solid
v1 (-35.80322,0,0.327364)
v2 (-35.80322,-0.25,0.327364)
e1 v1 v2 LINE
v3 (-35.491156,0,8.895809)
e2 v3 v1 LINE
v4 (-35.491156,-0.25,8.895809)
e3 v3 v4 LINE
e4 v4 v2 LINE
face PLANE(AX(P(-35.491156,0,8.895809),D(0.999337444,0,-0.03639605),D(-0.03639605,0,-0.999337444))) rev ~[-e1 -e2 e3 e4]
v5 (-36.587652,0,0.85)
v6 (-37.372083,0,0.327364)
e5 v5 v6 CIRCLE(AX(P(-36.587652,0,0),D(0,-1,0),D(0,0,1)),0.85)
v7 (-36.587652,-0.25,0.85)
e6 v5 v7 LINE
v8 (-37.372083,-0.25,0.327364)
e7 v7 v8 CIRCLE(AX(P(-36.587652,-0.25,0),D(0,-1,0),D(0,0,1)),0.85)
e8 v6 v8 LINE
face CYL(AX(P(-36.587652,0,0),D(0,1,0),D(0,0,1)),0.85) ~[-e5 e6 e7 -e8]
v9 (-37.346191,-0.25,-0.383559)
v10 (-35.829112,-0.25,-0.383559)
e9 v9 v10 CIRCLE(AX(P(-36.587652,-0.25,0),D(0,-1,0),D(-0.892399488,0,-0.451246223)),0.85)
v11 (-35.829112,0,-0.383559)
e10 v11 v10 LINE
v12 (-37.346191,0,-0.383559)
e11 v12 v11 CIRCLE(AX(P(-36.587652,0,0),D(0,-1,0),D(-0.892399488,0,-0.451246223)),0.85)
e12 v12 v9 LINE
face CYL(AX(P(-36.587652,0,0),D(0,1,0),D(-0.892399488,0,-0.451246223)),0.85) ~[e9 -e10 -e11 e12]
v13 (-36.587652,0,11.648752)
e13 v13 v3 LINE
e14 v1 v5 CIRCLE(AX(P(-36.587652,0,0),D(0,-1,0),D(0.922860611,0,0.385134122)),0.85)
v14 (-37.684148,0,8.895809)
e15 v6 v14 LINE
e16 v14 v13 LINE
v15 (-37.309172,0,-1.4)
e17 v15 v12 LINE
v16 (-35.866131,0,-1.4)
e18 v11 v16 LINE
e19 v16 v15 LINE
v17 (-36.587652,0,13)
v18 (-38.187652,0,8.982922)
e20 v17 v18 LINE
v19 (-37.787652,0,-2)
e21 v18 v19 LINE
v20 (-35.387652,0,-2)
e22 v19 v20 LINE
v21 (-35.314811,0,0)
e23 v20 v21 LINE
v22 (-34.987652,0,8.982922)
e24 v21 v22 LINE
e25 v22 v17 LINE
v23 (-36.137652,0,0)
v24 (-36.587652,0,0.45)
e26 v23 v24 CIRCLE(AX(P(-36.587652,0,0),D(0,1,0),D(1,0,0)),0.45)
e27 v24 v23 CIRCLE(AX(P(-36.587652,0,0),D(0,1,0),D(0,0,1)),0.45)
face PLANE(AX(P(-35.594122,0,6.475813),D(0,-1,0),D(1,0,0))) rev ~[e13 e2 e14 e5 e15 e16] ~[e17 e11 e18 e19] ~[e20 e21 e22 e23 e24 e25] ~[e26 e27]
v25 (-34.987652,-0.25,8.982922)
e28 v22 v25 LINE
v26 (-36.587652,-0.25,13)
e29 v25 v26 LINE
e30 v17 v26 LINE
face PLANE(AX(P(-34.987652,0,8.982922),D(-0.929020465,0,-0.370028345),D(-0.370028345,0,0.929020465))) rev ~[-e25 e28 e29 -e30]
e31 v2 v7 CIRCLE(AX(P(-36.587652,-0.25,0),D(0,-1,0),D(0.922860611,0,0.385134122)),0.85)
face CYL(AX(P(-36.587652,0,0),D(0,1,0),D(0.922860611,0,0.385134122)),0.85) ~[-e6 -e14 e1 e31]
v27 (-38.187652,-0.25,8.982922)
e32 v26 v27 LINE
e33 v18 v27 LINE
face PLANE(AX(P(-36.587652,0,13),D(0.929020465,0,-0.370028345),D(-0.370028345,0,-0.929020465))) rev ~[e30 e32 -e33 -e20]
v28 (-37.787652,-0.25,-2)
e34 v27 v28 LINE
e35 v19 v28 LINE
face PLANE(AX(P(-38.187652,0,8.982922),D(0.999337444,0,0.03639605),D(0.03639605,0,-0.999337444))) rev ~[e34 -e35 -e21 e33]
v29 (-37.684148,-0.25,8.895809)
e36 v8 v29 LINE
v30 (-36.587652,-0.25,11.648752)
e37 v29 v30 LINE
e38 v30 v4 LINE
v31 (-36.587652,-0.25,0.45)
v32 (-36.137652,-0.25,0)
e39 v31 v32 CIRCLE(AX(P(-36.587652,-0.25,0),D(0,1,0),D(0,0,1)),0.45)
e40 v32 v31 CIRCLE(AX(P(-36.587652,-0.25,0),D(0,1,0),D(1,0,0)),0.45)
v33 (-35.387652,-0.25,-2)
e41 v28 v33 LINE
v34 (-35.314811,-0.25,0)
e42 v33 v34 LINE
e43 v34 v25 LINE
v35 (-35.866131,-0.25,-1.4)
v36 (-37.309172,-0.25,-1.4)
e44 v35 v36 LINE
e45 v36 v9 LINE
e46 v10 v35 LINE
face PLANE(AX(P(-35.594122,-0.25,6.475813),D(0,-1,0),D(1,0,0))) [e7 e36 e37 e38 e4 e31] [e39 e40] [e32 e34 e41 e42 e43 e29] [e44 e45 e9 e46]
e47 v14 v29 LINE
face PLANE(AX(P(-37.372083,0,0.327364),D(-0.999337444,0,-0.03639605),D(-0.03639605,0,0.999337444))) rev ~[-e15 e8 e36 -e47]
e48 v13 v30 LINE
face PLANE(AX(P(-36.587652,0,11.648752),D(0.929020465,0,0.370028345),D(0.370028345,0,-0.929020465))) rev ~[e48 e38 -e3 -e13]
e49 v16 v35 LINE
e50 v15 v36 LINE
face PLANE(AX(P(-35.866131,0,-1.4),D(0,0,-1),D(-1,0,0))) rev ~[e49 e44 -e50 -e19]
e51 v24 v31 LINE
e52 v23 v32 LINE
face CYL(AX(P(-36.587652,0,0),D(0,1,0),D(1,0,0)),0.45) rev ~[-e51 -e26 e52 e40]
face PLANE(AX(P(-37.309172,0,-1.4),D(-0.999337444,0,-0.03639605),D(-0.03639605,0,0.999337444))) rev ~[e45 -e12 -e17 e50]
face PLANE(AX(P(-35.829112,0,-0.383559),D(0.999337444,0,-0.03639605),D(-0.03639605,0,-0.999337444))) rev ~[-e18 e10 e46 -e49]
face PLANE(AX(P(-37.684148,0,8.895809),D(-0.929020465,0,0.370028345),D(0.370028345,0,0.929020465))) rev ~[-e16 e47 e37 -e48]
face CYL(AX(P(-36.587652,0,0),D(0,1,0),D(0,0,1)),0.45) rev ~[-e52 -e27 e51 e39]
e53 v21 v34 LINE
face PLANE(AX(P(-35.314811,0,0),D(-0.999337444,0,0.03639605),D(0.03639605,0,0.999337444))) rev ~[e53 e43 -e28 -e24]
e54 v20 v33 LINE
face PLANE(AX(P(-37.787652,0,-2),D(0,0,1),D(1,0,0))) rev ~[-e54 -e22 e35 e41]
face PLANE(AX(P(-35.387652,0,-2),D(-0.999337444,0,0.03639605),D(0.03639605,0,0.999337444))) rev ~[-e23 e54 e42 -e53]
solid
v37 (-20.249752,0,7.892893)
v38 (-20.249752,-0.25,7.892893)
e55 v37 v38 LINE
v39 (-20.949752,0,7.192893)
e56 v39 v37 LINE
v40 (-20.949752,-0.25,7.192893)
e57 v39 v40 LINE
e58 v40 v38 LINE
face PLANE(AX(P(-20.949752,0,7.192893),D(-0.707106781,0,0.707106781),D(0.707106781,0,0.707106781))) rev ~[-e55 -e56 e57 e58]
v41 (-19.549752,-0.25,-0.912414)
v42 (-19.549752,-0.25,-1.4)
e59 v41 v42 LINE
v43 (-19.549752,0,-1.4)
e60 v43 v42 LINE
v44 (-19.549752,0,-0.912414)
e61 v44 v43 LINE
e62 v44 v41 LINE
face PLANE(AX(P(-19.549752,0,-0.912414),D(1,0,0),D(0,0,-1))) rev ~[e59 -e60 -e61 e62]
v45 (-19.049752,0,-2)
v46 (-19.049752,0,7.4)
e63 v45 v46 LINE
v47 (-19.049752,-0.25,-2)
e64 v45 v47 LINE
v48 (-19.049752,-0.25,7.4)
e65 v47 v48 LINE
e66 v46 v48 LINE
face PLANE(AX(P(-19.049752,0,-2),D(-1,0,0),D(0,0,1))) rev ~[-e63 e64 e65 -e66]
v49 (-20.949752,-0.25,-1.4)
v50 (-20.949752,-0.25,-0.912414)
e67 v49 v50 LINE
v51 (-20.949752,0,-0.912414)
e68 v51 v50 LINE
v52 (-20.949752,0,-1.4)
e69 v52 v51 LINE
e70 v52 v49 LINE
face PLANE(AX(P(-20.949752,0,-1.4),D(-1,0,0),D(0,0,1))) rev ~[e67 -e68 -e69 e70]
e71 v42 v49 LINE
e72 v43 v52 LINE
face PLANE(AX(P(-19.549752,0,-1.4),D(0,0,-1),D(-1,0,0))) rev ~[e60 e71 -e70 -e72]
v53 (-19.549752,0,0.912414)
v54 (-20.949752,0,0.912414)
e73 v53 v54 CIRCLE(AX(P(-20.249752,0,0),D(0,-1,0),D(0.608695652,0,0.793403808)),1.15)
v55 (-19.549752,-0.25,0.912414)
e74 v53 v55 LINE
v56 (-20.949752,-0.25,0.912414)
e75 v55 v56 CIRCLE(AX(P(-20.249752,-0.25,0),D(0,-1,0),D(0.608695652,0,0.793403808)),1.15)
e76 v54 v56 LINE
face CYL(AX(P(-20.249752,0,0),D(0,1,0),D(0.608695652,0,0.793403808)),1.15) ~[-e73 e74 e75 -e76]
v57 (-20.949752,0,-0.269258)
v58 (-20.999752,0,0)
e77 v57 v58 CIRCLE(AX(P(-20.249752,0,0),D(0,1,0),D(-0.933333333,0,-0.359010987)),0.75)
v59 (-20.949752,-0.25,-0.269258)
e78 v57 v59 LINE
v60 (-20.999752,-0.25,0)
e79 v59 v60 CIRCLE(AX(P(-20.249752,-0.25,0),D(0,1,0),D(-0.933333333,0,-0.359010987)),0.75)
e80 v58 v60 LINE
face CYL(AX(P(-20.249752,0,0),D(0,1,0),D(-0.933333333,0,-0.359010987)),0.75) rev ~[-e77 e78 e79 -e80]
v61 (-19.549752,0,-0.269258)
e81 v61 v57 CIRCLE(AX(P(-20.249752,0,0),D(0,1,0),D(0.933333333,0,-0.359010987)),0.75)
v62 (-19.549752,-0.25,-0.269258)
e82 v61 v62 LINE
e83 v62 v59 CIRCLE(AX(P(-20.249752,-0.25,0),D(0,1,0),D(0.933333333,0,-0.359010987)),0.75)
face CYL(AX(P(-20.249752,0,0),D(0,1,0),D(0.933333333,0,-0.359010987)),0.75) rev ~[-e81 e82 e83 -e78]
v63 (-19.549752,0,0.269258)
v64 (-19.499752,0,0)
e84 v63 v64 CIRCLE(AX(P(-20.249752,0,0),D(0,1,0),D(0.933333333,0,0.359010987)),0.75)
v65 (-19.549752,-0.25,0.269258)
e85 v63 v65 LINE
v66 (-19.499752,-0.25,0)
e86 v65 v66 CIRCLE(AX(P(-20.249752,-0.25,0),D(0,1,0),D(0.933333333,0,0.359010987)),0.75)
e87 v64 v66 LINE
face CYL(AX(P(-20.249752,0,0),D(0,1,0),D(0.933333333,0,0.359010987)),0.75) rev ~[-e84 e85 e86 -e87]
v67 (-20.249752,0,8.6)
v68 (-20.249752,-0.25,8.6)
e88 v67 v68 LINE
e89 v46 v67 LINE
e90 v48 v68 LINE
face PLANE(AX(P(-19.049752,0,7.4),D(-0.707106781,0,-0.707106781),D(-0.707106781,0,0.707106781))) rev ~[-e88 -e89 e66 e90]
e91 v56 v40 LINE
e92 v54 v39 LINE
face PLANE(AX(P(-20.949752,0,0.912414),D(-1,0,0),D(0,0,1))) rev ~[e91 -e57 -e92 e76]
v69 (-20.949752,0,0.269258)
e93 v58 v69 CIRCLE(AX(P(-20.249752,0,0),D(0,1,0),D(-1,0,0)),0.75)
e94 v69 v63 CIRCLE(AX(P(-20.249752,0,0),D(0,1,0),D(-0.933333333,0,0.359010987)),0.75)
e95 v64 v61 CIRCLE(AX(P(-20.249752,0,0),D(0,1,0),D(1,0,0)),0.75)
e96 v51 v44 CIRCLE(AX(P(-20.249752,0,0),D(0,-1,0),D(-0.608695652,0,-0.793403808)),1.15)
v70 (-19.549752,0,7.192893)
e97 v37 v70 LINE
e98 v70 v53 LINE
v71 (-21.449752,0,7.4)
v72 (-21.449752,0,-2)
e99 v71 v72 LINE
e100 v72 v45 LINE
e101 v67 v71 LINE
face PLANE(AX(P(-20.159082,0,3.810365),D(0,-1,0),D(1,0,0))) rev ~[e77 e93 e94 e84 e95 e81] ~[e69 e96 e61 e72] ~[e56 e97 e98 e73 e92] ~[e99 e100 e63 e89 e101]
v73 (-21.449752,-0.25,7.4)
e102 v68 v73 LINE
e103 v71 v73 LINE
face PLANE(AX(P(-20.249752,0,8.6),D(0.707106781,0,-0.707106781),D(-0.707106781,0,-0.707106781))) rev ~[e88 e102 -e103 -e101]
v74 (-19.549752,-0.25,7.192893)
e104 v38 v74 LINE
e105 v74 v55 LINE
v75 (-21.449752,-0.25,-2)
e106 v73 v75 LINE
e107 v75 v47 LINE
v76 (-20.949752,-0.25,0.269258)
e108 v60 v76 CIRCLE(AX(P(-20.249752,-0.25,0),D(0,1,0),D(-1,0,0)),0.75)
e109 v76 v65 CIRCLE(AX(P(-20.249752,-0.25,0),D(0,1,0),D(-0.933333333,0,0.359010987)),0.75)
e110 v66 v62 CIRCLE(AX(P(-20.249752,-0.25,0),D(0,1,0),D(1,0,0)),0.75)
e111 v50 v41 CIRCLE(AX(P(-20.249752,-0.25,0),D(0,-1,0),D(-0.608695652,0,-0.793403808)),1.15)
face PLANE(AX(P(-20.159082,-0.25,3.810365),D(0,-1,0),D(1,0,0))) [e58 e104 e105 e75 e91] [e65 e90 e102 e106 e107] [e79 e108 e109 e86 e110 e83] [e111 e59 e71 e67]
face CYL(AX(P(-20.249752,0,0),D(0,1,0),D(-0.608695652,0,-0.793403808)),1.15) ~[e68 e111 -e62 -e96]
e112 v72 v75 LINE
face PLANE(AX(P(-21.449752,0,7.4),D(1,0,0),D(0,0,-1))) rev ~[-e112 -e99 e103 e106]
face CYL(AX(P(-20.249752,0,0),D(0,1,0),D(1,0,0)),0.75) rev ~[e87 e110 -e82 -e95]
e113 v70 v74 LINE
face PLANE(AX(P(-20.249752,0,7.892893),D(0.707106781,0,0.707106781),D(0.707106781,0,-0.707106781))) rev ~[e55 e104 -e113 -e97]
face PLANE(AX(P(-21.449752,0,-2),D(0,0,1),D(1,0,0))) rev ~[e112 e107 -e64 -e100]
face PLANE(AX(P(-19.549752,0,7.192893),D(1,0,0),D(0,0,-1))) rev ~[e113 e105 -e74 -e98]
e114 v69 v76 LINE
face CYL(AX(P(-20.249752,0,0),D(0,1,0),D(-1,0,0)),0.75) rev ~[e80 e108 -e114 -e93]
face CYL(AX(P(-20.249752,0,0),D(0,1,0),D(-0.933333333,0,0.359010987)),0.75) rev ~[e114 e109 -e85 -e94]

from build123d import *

# Parameters (mm, degrees)
F1_DEPTH = 0.25
F0_W     = 3
F0_H     = 0.6


# Not quite as in the source:
# - a feature names something its author has since deleted; it is built from what else it names


with BuildPart() as f1:
    # F0 (on Front) → F1 (new body)
    with BuildSketch(Plane.XZ):
        with BuildLine():
            Line((-21.4497518182, 1.5), (-21.4497518182, 0))
            Line((-21.4497518182, 0), (-21.3997518182, 0))
            ThreePointArc((-21.3997518182, 0), (-21.2811343854, 0.5086747487), (-20.9497518182, 0.9124143795))
            Line((-20.9497518182, 0.9124143795), (-20.9497518182, 1.5))
            Line((-20.9497518182, 1.5), (-20.9497518182, 7.1928932188))
            Line((-20.9497518182, 7.1928932188), (-20.2497518182, 7.8928932188))
            Line((-20.2497518182, 7.8928932188), (-19.5497518182, 7.1928932188))
            Line((-19.5497518182, 7.1928932188), (-19.5497518182, 1.5))
            Line((-19.5497518182, 1.5), (-19.5497518182, 0.9124143795))
            ThreePointArc((-19.5497518182, 0.9124143795), (-19.2183692509, 0.5086747487), (-19.0997518182, 0))
            ThreePointArc((-19.0997518182, 0), (-19.2183692509, -0.5086747487), (-19.5497518182, -0.9124143795))
            Line((-19.5497518182, -0.9124143795), (-19.5497518182, -1.4))
            Line((-19.5497518182, -1.4), (-19.0497518182, -1.4))
            Line((-19.0497518182, -1.4), (-19.0497518182, 1.5))
            Line((-19.0497518182, 1.5), (-19.0497518182, 7.4))
            Line((-19.0497518182, 7.4), (-20.2497518182, 8.6))
            Line((-20.2497518182, 8.6), (-21.4497518182, 7.4))
            Line((-21.4497518182, 7.4), (-21.4497518182, 1.5))
        make_face()
        with BuildLine():
            Line((-21.3997518182, 0), (-21.4497518182, 0))
            Line((-21.4497518182, 0), (-21.4497518182, -1.4))
            Line((-21.4497518182, -1.4), (-20.9497518182, -1.4))
            Line((-20.9497518182, -1.4), (-20.9497518182, -0.9124143795))
            ThreePointArc((-20.9497518182, -0.9124143795), (-21.2811343854, -0.5086747487), (-21.3997518182, 0))
        make_face()
        Polygon((-20.9497518182, -1.4), (-21.4497518182, -1.4), (-21.4497518182, -2), (-20.2497518182, -2), (-19.0497518182, -2), (-19.0497518182, -1.4), (-19.5497518182, -1.4), (-20.2497518182, -1.4), align=None)
        with BuildLine():
            ThreePointArc((-19.5497518182, 0.9124143795), (-20.2497518182, 1.15), (-20.9497518182, 0.9124143795))
            Line((-20.9497518182, 0.9124143795), (-20.9497518182, 0.2692582404))
            ThreePointArc((-20.9497518182, 0.2692582404), (-20.2497518182, 0.75), (-19.5497518182, 0.2692582404))
            Line((-19.5497518182, 0.2692582404), (-19.5497518182, 0.9124143795))
        make_face()
        with BuildLine():
            ThreePointArc((-19.0997518182, 0), (-19.2183692509, 0.5086747487), (-19.5497518182, 0.9124143795))
            Line((-19.5497518182, 0.9124143795), (-19.5497518182, 0.2692582404))
            ThreePointArc((-19.5497518182, 0.2692582404), (-19.512357758, 0.1369306394), (-19.4997518182, 0))
            ThreePointArc((-19.4997518182, 0), (-19.512357758, -0.1369306394), (-19.5497518182, -0.2692582404))
            Line((-19.5497518182, -0.2692582404), (-19.5497518182, -0.9124143795))
            ThreePointArc((-19.5497518182, -0.9124143795), (-19.2183692509, -0.5086747487), (-19.0997518182, 0))
        make_face()
        with BuildLine():
            Line((-20.9497518182, -0.2692582404), (-20.9497518182, -0.9124143795))
            ThreePointArc((-20.9497518182, -0.9124143795), (-20.2497518182, -1.15), (-19.5497518182, -0.9124143795))
            Line((-19.5497518182, -0.9124143795), (-19.5497518182, -0.2692582404))
            ThreePointArc((-19.5497518182, -0.2692582404), (-20.2497518182, -0.75), (-20.9497518182, -0.2692582404))
        make_face()
        with BuildLine():
            Line((-20.9997518182, 0), (-21.3997518182, 0))
            ThreePointArc((-21.3997518182, 0), (-21.2811343854, -0.5086747487), (-20.9497518182, -0.9124143795))
            Line((-20.9497518182, -0.9124143795), (-20.9497518182, -0.2692582404))
            ThreePointArc((-20.9497518182, -0.2692582404), (-20.9871458784, -0.1369306394), (-20.9997518182, 0))
        make_face()
        with BuildLine():
            ThreePointArc((-20.9497518182, 0.9124143795), (-21.2811343854, 0.5086747487), (-21.3997518182, 0))
            Line((-21.3997518182, 0), (-20.9997518182, 0))
            ThreePointArc((-20.9997518182, 0), (-20.9871458784, 0.1369306394), (-20.9497518182, 0.2692582404))
            Line((-20.9497518182, 0.2692582404), (-20.9497518182, 0.9124143795))
        make_face()
    extrude(amount=F1_DEPTH)


with BuildPart() as f1b:
    # F0 (on Front) → F1, piece 2 (new body)
    with BuildSketch(Plane.XZ):
        with BuildLine():
            ThreePointArc((-28.7187018186, 0.6873863542), (-29.0461968385, 0.4107919181), (-29.1687018186, 0))
            Line((-29.1687018186, 0), (-28.7687018186, 0))
            ThreePointArc((-28.7687018186, 0), (-28.7559702577, 0.0935414347), (-28.7187018186, 0.1802775638))
            Line((-28.7187018186, 0.1802775638), (-28.7187018186, 0.6873863542))
        make_face()
        with BuildLine():
            Line((-28.7687018186, 0), (-29.1687018186, 0))
            ThreePointArc((-29.1687018186, 0), (-29.0461968385, -0.4107919181), (-28.7187018186, -0.6873863542))
            Line((-28.7187018186, -0.6873863542), (-28.7187018186, -0.1802775638))
            ThreePointArc((-28.7187018186, -0.1802775638), (-28.7559702577, -0.0935414347), (-28.7687018186, 0))
        make_face()
        with BuildLine():
            Line((-28.7187018186, 12.9938064694), (-28.7187018186, 0.6873863542))
            ThreePointArc((-28.7187018186, 0.6873863542), (-28.5719340514, 0.7341797347), (-28.4187018186, 0.75))
            Line((-28.4187018186, 0.75), (-28.4187018186, 12.9938064694))
            Line((-28.4187018186, 12.9938064694), (-28.7187018186, 12.9938064694))
        make_face()
        with BuildLine():
            ThreePointArc((-28.4187018186, 0.75), (-28.5719340514, 0.7341797347), (-28.7187018186, 0.6873863542))
            Line((-28.7187018186, 0.6873863542), (-28.7187018186, 0.1802775638))
            ThreePointArc((-28.7187018186, 0.1802775638), (-28.5910428362, 0.3046285831), (-28.4187018186, 0.35))
            Line((-28.4187018186, 0.35), (-28.4187018186, 0.75))
        make_face()
        with BuildLine():
            Line((-28.7187018186, -0.1802775638), (-28.7187018186, -0.6873863542))
            ThreePointArc((-28.7187018186, -0.6873863542), (-28.5719340514, -0.7341797347), (-28.4187018186, -0.75))
            Line((-28.4187018186, -0.75), (-28.4187018186, -0.35))
            ThreePointArc((-28.4187018186, -0.35), (-28.5910428362, -0.3046285831), (-28.7187018186, -0.1802775638))
        make_face()
        with BuildLine():
            ThreePointArc((-28.4187018186, -0.75), (-28.5719340514, -0.7341797347), (-28.7187018186, -0.6873863542))
            Line((-28.7187018186, -0.6873863542), (-28.7187018186, -12.9938064694))
            Line((-28.7187018186, -12.9938064694), (-28.4187018186, -12.9938064694))
            Line((-28.4187018186, -12.9938064694), (-28.4187018186, -0.75))
        make_face()
        with BuildLine():
            Line((-28.4187018186, 12.9938064694), (-28.4187018186, 0.75))
            ThreePointArc((-28.4187018186, 0.75), (-28.2654695858, 0.7341797347), (-28.1187018186, 0.6873863542))
            Line((-28.1187018186, 0.6873863542), (-28.1187018186, 12.9938064694))
            Line((-28.1187018186, 12.9938064694), (-28.4187018186, 12.9938064694))
        make_face()
        with BuildLine():
            ThreePointArc((-28.1187018186, 0.6873863542), (-28.2654695858, 0.7341797347), (-28.4187018186, 0.75))
            Line((-28.4187018186, 0.75), (-28.4187018186, 0.35))
            ThreePointArc((-28.4187018186, 0.35), (-28.246360801, 0.3046285831), (-28.1187018186, 0.1802775638))
            Line((-28.1187018186, 0.1802775638), (-28.1187018186, 0.6873863542))
        make_face()
        with BuildLine():
            Line((-28.4187018186, -0.35), (-28.4187018186, -0.75))
            ThreePointArc((-28.4187018186, -0.75), (-28.2654695858, -0.7341797347), (-28.1187018186, -0.6873863542))
            Line((-28.1187018186, -0.6873863542), (-28.1187018186, -0.1802775638))
            ThreePointArc((-28.1187018186, -0.1802775638), (-28.246360801, -0.3046285831), (-28.4187018186, -0.35))
        make_face()
        with BuildLine():
            ThreePointArc((-28.1187018186, -0.6873863542), (-28.2654695858, -0.7341797347), (-28.4187018186, -0.75))
            Line((-28.4187018186, -0.75), (-28.4187018186, -12.9938064694))
            Line((-28.4187018186, -12.9938064694), (-28.1187018186, -12.9938064694))
            Line((-28.1187018186, -12.9938064694), (-28.1187018186, -0.6873863542))
        make_face()
        with BuildLine():
            ThreePointArc((-27.6687018186, 0), (-27.7912067987, 0.4107919181), (-28.1187018186, 0.6873863542))
            Line((-28.1187018186, 0.6873863542), (-28.1187018186, 0.1802775638))
            ThreePointArc((-28.1187018186, 0.1802775638), (-28.0814333795, 0.0935414347), (-28.0687018186, 0))
            Line((-28.0687018186, 0), (-27.6687018186, 0))
        make_face()
        with BuildLine():
            Line((-28.1187018186, -0.1802775638), (-28.1187018186, -0.6873863542))
            ThreePointArc((-28.1187018186, -0.6873863542), (-27.7912067987, -0.4107919181), (-27.6687018186, 0))
            Line((-27.6687018186, 0), (-28.0687018186, 0))
            ThreePointArc((-28.0687018186, 0), (-28.0814333795, -0.0935414347), (-28.1187018186, -0.1802775638))
        make_face()
    extrude(amount=F1_DEPTH)


with BuildPart() as f1c:
    # F0 (on Front) → F1, piece 3 (new body)
    with BuildSketch(Plane.XZ):
        with BuildLine():
            Line((-34.987651819, 8.9829219505), (-36.587651819, 13))
            Line((-36.587651819, 13), (-36.587651819, 11.6487521661))
            Line((-36.587651819, 11.6487521661), (-35.4911559916, 8.8958088415))
            Line((-35.4911559916, 8.8958088415), (-35.8032202993, 0.3273640038))
            ThreePointArc((-35.8032202993, 0.3273640038), (-35.7542051225, 0.1669329331), (-35.737651819, 0))
            Line((-35.737651819, 0), (-35.314811458, 0))
            Line((-35.314811458, 0), (-34.987651819, 8.9829219505))
        make_face()
        with BuildLine():
            Line((-36.587651819, 11.6487521661), (-36.587651819, 13))
            Line((-36.587651819, 13), (-38.187651819, 8.9829219505))
            Line((-38.187651819, 8.9829219505), (-37.787651819, -2))
            Line((-37.787651819, -2), (-36.587651819, -2))
            Line((-36.587651819, -2), (-35.387651819, -2))
            Line((-35.387651819, -2), (-35.314811458, 0))
            Line((-35.314811458, 0), (-35.737651819, 0))
            ThreePointArc((-35.737651819, 0), (-35.7608330268, -0.1971564985), (-35.829112254, -0.3835592892))
            Line((-35.829112254, -0.3835592892), (-35.8661312082, -1.4))
            Line((-35.8661312082, -1.4), (-36.587651819, -1.4))
            Line((-36.587651819, -1.4), (-37.3091724298, -1.4))
            Line((-37.3091724298, -1.4), (-37.346191384, -0.3835592892))
            ThreePointArc((-37.346191384, -0.3835592892), (-37.4370886466, -0.0309366426), (-37.3720833386, 0.3273640038))
            Line((-37.3720833386, 0.3273640038), (-37.6841476463, 8.8958088415))
            Line((-37.6841476463, 8.8958088415), (-36.587651819, 11.6487521661))
        make_face()
        with BuildLine():
            ThreePointArc((-35.829112254, -0.3835592892), (-35.7608330268, -0.1971564985), (-35.737651819, 0))
            Line((-35.737651819, 0), (-36.137651819, 0))
            ThreePointArc((-36.137651819, 0), (-36.9058498705, -0.3181980515), (-36.587651819, 0.45))
            Line((-36.587651819, 0.45), (-36.587651819, 0.85))
            ThreePointArc((-36.587651819, 0.85), (-37.0589482208, 0.7073752198), (-37.3720833386, 0.3273640038))
            ThreePointArc((-37.3720833386, 0.3273640038), (-37.4370886466, -0.0309366426), (-37.346191384, -0.3835592892))
            ThreePointArc((-37.346191384, -0.3835592892), (-36.587651819, -0.85), (-35.829112254, -0.3835592892))
        make_face()
        with BuildLine():
            Line((-36.137651819, 0), (-35.737651819, 0))
            ThreePointArc((-35.737651819, 0), (-35.7542051225, 0.1669329331), (-35.8032202993, 0.3273640038))
            ThreePointArc((-35.8032202993, 0.3273640038), (-36.1163554172, 0.7073752198), (-36.587651819, 0.85))
            Line((-36.587651819, 0.85), (-36.587651819, 0.45))
            ThreePointArc((-36.587651819, 0.45), (-36.2694537675, 0.3181980515), (-36.137651819, 0))
        make_face()
    extrude(amount=F1_DEPTH)


with BuildPart() as f1d:
    # F0 (on Front) → F1, piece 4 (new body)
    with BuildSketch(Plane.XZ):
        with Locations((-24.663922295, 11.3997036099)):
            Rectangle(F0_W, F0_H)
    extrude(amount=F1_DEPTH)


with BuildPart() as f1e:
    # F0 (on Front) → F1, piece 5 (new body)
    with BuildSketch(Plane.XZ):
        with Locations((-24.663922295, 9.8090009272)):
            Rectangle(F0_W, F0_H)
    extrude(amount=F1_DEPTH)


solid = Compound([f1.part, f1c.part])
